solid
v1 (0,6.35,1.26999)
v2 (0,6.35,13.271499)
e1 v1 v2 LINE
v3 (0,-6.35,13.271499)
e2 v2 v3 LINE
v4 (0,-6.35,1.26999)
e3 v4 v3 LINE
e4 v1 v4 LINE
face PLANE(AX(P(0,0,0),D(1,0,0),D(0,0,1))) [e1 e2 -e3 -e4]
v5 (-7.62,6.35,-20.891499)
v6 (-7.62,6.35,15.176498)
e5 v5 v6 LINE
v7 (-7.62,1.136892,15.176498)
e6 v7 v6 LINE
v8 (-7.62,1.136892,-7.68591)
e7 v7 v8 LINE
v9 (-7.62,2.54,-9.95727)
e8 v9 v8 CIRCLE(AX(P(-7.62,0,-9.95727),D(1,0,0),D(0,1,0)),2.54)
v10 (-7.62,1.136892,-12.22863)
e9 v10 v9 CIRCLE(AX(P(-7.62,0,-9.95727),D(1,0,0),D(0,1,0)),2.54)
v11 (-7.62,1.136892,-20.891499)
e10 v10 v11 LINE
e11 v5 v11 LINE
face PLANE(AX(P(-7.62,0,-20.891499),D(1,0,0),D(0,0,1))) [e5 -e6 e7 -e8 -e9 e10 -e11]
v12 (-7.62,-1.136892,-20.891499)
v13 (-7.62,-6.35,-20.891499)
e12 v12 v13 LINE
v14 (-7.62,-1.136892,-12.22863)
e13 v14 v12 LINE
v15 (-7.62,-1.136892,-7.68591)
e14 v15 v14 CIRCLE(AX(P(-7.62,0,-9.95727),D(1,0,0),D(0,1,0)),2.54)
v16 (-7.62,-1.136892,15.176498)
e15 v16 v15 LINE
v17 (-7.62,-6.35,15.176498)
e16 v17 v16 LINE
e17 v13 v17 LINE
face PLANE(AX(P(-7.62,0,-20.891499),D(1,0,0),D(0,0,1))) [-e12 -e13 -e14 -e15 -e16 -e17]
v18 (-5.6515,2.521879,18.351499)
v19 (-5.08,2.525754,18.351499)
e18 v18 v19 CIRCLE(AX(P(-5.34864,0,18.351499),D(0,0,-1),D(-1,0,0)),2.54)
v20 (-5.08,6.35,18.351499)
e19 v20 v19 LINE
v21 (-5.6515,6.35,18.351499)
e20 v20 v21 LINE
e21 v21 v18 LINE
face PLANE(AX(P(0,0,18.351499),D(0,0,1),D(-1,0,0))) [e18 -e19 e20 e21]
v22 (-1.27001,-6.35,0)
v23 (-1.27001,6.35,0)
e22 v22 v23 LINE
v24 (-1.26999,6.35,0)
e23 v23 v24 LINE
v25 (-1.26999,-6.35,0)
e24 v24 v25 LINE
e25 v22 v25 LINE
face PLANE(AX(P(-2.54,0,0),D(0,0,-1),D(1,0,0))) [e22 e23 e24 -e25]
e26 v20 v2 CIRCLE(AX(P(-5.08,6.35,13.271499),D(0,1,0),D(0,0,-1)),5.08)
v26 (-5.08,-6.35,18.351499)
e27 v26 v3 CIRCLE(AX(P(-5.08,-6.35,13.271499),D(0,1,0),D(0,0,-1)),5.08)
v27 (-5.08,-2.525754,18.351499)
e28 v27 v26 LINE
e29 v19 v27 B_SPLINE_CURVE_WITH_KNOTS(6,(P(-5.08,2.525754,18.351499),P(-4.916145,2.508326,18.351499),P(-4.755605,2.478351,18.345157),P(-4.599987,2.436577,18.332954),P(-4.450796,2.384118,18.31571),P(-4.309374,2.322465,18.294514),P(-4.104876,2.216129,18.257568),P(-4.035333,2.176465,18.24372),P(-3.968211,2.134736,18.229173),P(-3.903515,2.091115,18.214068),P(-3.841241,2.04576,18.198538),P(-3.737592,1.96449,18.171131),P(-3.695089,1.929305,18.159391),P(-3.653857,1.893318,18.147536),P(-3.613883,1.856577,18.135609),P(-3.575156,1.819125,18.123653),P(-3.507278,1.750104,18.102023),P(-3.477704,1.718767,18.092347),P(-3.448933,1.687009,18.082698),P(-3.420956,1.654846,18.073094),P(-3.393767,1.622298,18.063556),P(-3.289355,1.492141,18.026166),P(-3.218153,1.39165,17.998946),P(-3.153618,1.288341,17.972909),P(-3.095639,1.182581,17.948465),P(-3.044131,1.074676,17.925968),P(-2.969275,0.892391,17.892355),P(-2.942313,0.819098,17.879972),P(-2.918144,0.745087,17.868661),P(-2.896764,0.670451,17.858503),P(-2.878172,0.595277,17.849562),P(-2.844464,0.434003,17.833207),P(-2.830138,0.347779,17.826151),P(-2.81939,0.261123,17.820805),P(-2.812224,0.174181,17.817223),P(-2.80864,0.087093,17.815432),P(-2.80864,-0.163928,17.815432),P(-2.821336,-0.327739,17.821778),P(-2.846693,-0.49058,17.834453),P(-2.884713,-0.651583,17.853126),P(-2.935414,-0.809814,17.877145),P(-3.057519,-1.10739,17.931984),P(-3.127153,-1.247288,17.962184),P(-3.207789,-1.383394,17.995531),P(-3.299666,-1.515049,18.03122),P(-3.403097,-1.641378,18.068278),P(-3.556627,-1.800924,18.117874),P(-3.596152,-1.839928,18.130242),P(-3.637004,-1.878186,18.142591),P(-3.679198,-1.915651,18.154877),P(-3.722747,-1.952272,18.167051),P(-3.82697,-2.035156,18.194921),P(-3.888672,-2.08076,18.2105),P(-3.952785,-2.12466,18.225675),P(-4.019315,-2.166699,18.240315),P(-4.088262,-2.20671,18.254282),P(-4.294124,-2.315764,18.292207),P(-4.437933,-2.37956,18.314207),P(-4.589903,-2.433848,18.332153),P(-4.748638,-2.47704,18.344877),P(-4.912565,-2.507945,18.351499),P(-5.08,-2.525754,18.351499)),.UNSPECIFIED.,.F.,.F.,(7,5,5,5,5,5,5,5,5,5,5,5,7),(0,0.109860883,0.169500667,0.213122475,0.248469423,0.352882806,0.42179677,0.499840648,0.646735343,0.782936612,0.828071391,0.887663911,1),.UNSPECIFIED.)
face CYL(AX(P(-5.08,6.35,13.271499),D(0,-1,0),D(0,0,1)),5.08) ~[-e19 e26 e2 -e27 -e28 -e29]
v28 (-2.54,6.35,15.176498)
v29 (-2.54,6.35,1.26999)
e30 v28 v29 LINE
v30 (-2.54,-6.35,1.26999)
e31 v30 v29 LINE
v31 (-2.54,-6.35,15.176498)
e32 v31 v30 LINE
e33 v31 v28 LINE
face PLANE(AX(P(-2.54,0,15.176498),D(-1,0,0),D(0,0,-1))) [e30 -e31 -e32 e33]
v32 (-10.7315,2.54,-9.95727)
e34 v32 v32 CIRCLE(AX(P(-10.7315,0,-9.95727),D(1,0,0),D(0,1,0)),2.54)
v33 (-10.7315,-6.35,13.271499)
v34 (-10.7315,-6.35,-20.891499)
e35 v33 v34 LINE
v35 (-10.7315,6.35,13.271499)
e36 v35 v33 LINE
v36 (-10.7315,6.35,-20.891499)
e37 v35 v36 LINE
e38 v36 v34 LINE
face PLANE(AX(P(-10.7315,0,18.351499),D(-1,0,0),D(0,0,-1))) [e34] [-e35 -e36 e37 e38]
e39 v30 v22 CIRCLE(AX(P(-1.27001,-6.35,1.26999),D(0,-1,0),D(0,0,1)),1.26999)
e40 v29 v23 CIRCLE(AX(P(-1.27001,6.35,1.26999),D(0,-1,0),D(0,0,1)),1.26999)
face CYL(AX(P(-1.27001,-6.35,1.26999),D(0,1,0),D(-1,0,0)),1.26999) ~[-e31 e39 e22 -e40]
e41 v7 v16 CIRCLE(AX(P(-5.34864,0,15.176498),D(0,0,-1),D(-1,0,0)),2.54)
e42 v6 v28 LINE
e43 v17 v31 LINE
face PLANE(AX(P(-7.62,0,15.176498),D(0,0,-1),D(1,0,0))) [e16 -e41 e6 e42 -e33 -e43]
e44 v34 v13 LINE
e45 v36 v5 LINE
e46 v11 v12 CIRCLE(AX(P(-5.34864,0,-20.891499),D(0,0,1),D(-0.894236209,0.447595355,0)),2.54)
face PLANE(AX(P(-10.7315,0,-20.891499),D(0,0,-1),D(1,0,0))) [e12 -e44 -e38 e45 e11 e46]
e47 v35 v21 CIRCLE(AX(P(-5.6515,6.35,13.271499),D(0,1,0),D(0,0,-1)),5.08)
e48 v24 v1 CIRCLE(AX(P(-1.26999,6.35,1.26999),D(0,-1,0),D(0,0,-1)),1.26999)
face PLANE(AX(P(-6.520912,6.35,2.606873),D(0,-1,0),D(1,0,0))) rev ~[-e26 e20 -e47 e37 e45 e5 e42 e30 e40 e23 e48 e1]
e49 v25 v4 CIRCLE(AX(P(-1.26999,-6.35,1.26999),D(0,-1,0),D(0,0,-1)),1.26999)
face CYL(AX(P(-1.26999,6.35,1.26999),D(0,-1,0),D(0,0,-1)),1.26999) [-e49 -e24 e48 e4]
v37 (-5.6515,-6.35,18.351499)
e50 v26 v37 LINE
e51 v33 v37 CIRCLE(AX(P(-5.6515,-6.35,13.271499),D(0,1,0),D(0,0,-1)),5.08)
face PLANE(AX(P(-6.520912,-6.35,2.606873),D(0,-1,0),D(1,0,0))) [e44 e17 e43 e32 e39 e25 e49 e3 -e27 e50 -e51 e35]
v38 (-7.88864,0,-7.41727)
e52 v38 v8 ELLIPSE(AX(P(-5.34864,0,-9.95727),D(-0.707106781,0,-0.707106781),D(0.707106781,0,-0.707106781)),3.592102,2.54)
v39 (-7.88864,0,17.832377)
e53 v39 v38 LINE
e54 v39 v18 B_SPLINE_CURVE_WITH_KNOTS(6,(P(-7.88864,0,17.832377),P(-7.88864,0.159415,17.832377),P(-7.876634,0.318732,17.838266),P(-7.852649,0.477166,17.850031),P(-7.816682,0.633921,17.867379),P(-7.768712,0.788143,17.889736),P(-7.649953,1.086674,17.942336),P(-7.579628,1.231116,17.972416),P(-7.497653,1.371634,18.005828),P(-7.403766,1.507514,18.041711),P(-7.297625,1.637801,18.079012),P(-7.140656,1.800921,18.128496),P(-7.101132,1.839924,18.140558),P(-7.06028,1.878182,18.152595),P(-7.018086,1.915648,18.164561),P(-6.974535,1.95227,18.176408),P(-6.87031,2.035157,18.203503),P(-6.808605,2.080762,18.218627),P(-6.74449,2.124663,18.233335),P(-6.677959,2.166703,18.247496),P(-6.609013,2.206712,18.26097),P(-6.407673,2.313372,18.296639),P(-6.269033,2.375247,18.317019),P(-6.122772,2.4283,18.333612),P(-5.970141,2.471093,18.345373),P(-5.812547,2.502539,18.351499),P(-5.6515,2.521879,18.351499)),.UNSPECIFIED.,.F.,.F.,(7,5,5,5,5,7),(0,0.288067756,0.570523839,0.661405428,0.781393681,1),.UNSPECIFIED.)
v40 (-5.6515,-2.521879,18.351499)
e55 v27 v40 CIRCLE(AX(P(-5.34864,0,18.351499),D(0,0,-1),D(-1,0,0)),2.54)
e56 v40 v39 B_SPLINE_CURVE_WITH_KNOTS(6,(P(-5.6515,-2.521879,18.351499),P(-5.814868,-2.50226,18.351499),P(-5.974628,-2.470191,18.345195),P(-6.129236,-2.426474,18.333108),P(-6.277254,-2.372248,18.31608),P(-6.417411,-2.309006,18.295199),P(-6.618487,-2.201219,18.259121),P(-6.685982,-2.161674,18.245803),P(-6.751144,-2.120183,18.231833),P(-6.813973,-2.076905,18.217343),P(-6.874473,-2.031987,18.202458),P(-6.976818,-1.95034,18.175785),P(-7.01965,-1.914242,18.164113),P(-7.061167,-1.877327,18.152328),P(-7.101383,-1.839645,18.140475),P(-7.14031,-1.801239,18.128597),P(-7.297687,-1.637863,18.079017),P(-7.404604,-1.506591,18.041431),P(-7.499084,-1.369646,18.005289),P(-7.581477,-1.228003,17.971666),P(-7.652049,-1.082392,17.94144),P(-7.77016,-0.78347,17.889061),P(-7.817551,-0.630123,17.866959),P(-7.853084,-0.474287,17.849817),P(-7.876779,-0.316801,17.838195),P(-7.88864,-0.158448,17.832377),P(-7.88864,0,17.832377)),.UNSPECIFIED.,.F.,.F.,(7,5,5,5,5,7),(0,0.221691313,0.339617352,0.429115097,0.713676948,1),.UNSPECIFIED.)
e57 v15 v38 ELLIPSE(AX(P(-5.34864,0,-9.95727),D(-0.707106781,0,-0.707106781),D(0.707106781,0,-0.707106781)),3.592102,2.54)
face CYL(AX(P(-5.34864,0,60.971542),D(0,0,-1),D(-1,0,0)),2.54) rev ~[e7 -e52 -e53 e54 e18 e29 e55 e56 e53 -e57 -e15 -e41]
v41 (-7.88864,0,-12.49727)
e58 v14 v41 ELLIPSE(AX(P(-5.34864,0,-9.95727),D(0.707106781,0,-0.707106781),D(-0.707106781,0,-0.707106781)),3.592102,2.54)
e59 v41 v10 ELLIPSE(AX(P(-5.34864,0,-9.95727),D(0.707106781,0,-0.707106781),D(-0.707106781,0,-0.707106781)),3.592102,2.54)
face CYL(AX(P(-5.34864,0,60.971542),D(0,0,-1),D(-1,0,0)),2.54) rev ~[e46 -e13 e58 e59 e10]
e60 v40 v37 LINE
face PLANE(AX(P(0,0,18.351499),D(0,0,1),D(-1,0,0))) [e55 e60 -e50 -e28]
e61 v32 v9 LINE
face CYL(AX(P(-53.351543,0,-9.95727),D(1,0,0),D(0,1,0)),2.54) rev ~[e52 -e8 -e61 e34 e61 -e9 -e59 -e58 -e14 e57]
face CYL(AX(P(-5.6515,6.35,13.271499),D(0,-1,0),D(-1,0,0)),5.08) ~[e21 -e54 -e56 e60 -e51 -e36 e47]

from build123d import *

# Parameters (mm, degrees)
F1_DEPTH = 6.35
F2_R     = 5.08
F5_D     = 5.08
F6_D     = 5.08
F7_R     = 1.26999


# Not quite as in the source:
# - a fillet or chamfer is up to 0.001 mm smaller than in the source, because OpenCascade refuses the exact size


with BuildPart() as f1:
    # F0 (on Front) → F1 (new body, symmetric)
    with BuildSketch(Plane.XZ):
        Polygon((-2.54, 0), (0, 0), (0, 18.3514992646), (-10.7314998529, 18.3514992646), (-10.7314998529, -20.8914992646), (-7.62, -20.8914992646), (-7.62, 15.176498382), (-2.54, 15.176498382), align=None)
    extrude(amount=F1_DEPTH, both=True)

    # F2
    f2_edges = [f1.edges().sort_by_distance(p)[0] for p in [
        (0, 0, 18.351499),
        (-10.7315, 0, 18.351499),
    ]]
    fillet(f2_edges, radius=F2_R)

    # F5 (through all)
    with Locations(Plane.XY.offset(18.3514992646)):
        with Locations((-5.3486400284, 0)):
            Hole(F5_D / 2)

    # F6 (through all)
    with Locations(Plane(origin=(-10.7314998529, 0, 0), x_dir=(0, -1, 0), z_dir=(-1, 0, 0))):
        with Locations((0, -9.9572697654)):
            Hole(F6_D / 2)

    # F7 (radius 1.27 in the source; OpenCascade refuses exactly that, so slightly less here)
    f7_edges = [f1.edges().sort_by_distance(p)[0] for p in [
        (0, 0, 0),
        (-2.54, 0, 0),
    ]]
    fillet(f7_edges, radius=F7_R)


solid = f1.part
